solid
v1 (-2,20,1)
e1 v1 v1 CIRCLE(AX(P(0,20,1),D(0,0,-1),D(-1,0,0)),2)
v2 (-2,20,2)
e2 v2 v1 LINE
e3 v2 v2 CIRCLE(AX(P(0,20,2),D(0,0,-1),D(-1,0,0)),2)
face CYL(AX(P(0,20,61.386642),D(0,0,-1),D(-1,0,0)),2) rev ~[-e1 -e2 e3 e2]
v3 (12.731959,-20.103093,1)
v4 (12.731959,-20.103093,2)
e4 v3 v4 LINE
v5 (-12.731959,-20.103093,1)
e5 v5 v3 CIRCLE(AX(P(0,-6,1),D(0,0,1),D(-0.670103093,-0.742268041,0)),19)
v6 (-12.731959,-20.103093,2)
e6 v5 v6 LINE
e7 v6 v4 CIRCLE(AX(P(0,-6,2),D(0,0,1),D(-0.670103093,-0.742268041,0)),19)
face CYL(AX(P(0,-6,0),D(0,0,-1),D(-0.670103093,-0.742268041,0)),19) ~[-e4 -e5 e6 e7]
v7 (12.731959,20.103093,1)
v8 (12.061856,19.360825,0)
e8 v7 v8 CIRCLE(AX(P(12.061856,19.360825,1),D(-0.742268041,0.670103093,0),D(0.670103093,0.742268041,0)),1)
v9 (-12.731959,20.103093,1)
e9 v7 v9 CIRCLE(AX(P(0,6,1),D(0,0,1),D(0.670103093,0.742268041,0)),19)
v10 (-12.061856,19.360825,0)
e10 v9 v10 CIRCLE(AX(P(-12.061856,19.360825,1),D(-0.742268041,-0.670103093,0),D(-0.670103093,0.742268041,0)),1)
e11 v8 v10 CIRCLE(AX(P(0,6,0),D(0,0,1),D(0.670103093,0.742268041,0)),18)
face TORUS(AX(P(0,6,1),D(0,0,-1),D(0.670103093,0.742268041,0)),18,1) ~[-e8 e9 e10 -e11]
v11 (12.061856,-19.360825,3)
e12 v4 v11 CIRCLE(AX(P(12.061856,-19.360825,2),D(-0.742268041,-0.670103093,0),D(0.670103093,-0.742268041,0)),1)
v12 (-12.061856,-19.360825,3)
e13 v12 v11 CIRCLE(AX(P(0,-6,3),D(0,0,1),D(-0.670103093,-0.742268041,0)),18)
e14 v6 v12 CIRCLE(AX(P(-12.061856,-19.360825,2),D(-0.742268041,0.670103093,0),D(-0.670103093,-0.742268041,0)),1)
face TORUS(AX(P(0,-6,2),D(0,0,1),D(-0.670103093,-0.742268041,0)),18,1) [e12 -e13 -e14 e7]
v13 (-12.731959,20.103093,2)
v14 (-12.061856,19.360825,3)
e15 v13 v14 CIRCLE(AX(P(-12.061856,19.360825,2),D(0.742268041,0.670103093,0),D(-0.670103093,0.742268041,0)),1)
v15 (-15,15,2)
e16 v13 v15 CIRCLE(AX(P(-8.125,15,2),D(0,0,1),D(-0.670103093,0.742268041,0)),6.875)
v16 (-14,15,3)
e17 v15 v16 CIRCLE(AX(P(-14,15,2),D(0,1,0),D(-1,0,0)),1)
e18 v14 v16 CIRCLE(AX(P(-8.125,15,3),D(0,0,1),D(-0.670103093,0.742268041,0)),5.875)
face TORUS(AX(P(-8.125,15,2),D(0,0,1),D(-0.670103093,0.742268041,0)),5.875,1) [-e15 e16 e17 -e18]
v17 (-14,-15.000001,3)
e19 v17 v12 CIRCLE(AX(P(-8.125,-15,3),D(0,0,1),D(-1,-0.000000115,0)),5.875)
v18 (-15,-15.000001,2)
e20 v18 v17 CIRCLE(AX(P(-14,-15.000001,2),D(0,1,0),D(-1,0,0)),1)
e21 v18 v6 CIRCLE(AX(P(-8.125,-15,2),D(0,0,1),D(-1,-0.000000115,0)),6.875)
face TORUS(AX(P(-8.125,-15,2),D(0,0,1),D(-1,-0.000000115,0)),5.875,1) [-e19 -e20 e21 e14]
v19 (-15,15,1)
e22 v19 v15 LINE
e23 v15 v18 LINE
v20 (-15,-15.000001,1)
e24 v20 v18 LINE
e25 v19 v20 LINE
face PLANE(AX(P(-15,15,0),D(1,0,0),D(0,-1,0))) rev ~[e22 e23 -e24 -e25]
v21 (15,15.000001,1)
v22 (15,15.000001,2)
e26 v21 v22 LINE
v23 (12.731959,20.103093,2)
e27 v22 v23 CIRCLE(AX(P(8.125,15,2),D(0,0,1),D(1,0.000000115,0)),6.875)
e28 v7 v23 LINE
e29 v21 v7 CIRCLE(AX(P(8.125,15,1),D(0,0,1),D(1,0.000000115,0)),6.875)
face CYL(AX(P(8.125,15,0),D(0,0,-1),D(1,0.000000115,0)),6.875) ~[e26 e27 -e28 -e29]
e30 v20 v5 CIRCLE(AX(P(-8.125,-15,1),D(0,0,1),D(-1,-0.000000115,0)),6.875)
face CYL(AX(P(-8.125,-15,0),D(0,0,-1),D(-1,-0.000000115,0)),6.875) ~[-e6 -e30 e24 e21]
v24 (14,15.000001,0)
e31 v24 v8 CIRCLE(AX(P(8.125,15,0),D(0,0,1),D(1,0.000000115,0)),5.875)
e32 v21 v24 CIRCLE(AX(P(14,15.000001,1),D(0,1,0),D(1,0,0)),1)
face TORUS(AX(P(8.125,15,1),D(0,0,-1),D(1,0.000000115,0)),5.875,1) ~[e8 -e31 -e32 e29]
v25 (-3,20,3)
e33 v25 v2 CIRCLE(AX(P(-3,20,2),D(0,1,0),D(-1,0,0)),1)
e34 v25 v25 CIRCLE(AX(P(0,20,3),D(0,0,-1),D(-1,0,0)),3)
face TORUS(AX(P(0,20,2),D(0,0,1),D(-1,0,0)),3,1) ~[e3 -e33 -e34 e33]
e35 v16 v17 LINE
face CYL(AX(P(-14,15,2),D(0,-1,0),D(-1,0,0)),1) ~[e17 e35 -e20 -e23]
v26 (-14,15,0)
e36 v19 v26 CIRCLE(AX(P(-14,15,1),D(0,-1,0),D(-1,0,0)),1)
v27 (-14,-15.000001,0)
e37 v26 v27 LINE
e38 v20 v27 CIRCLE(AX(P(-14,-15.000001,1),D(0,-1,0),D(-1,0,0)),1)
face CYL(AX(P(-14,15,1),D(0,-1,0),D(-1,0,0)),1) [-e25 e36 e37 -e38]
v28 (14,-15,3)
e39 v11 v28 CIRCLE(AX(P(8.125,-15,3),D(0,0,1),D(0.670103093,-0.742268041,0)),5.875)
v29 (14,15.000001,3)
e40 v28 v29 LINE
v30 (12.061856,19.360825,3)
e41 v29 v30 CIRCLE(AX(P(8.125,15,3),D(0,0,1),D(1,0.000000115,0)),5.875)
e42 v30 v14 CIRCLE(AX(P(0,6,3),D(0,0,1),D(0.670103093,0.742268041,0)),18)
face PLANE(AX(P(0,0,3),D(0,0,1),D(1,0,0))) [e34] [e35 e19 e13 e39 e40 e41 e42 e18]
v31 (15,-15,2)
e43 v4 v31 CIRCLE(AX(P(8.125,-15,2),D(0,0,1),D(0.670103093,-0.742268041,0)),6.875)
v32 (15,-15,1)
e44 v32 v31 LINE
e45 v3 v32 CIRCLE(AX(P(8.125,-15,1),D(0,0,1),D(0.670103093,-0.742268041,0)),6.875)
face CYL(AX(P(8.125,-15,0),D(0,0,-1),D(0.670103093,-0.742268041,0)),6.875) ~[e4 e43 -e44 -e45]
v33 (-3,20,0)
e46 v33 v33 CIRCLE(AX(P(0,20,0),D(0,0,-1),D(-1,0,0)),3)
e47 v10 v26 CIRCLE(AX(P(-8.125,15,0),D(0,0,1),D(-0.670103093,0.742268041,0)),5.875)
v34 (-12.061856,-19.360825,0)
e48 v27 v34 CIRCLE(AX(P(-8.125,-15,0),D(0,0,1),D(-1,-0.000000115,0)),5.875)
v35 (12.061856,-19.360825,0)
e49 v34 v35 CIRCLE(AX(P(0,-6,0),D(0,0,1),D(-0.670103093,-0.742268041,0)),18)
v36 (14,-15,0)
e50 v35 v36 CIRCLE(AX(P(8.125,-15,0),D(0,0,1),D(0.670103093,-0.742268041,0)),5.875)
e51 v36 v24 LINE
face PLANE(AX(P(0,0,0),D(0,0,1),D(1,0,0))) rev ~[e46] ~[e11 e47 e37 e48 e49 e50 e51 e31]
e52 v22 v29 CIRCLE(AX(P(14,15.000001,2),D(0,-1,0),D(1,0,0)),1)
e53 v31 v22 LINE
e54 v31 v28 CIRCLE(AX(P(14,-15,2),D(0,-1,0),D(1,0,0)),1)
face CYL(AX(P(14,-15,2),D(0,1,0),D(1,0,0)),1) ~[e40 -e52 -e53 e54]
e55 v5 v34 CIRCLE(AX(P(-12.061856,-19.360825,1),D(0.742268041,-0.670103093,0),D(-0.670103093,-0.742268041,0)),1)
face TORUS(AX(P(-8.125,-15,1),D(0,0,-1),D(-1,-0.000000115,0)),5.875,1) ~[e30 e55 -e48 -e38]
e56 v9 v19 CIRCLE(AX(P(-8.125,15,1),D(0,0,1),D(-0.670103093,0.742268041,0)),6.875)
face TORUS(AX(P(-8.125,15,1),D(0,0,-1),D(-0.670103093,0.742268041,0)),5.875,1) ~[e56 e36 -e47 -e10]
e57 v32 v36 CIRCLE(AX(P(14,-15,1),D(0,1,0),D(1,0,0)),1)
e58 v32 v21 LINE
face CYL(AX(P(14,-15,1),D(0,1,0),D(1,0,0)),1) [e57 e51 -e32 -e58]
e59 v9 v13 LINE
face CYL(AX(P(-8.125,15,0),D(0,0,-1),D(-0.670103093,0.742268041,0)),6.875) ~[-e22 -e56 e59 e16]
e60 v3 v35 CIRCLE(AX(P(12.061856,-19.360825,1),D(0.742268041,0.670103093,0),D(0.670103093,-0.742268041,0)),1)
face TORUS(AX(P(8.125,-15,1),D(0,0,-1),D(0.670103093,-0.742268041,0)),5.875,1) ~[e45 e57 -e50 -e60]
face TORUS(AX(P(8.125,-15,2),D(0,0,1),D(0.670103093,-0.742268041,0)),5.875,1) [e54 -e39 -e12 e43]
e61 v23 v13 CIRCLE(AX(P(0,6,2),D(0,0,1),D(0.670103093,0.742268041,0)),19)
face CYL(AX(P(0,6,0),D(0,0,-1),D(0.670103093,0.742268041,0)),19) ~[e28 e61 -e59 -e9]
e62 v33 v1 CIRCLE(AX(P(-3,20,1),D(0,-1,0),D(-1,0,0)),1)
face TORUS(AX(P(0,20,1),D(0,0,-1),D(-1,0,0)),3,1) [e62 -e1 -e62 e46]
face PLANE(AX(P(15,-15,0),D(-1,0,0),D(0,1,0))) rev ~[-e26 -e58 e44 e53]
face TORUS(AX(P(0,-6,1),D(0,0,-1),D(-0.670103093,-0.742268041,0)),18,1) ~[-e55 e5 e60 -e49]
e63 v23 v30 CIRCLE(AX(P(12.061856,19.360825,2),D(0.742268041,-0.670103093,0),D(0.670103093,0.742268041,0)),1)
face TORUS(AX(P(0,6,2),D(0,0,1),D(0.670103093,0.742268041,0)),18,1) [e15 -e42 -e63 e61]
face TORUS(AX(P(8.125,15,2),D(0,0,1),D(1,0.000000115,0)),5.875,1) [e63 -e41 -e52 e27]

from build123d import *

# Parameters (mm, degrees)
F1_DEPTH = 3
F3_D     = 4
F4_R     = 1


# Not quite as in the source:
# - ends of sketch curves that miss each other by under 0.0002 mm in the source are joined


with BuildPart() as f1:
    # F0 (on Top) → F1 (new body)
    with BuildSketch(Plane.XY):
        with BuildLine():
            Line((15, -15), (15, 15.0000007931))
            ThreePointArc((15, 15.0000007931), (14.4074542357, 17.7922023165), (12.7319587629, 20.1030927835))
            ThreePointArc((12.7319587629, 20.1030927835), (0, 25), (-12.7319587629, 20.1030927835))
            ThreePointArc((-12.7319587629, 20.1030927835), (-14.4074543968, 17.7922019541), (-15, 15))
            Line((-15, 15), (-15, -15.0000007931))
            ThreePointArc((-15, -15.0000007931), (-14.4074543968, -17.7922019541), (-12.7319587629, -20.1030927835))
            ThreePointArc((-12.7319587629, -20.1030927835), (0, -25), (12.7319587629, -20.1030927835))
            ThreePointArc((12.7319587629, -20.1030927835), (14.4074542357, -17.7922023165), (15, -15))
        make_face()
    extrude(amount=F1_DEPTH)

    # F3 (through all)
    with Locations(Plane.XY.offset(3)):
        with Locations((0, 20)):
            Hole(F3_D / 2)

    # F4
    f4_edges = [f1.edges().sort_by_distance(p)[0] for p in [
        (14.407454, -17.792202, 3),
        (0, -25, 3),
        (15, 0, 3),
        (-14.407454, -17.792202, 3),
        (14.407454, 17.792202, 3),
        (-15, 0, 3),
        (0, 25, 3),
        (-14.407454, 17.792202, 3),
        (-2, 20, 3),
        (14.407454, -17.792202, 0),
        (0, -25, 0),
        (15, 0, 0),
        (-14.407454, -17.792202, 0),
        (14.407454, 17.792202, 0),
        (-15, 0, 0),
        (0, 25, 0),
        (-14.407454, 17.792202, 0),
        (-2, 20, 0),
    ]]
    fillet(f4_edges, radius=F4_R)


solid = f1.part
